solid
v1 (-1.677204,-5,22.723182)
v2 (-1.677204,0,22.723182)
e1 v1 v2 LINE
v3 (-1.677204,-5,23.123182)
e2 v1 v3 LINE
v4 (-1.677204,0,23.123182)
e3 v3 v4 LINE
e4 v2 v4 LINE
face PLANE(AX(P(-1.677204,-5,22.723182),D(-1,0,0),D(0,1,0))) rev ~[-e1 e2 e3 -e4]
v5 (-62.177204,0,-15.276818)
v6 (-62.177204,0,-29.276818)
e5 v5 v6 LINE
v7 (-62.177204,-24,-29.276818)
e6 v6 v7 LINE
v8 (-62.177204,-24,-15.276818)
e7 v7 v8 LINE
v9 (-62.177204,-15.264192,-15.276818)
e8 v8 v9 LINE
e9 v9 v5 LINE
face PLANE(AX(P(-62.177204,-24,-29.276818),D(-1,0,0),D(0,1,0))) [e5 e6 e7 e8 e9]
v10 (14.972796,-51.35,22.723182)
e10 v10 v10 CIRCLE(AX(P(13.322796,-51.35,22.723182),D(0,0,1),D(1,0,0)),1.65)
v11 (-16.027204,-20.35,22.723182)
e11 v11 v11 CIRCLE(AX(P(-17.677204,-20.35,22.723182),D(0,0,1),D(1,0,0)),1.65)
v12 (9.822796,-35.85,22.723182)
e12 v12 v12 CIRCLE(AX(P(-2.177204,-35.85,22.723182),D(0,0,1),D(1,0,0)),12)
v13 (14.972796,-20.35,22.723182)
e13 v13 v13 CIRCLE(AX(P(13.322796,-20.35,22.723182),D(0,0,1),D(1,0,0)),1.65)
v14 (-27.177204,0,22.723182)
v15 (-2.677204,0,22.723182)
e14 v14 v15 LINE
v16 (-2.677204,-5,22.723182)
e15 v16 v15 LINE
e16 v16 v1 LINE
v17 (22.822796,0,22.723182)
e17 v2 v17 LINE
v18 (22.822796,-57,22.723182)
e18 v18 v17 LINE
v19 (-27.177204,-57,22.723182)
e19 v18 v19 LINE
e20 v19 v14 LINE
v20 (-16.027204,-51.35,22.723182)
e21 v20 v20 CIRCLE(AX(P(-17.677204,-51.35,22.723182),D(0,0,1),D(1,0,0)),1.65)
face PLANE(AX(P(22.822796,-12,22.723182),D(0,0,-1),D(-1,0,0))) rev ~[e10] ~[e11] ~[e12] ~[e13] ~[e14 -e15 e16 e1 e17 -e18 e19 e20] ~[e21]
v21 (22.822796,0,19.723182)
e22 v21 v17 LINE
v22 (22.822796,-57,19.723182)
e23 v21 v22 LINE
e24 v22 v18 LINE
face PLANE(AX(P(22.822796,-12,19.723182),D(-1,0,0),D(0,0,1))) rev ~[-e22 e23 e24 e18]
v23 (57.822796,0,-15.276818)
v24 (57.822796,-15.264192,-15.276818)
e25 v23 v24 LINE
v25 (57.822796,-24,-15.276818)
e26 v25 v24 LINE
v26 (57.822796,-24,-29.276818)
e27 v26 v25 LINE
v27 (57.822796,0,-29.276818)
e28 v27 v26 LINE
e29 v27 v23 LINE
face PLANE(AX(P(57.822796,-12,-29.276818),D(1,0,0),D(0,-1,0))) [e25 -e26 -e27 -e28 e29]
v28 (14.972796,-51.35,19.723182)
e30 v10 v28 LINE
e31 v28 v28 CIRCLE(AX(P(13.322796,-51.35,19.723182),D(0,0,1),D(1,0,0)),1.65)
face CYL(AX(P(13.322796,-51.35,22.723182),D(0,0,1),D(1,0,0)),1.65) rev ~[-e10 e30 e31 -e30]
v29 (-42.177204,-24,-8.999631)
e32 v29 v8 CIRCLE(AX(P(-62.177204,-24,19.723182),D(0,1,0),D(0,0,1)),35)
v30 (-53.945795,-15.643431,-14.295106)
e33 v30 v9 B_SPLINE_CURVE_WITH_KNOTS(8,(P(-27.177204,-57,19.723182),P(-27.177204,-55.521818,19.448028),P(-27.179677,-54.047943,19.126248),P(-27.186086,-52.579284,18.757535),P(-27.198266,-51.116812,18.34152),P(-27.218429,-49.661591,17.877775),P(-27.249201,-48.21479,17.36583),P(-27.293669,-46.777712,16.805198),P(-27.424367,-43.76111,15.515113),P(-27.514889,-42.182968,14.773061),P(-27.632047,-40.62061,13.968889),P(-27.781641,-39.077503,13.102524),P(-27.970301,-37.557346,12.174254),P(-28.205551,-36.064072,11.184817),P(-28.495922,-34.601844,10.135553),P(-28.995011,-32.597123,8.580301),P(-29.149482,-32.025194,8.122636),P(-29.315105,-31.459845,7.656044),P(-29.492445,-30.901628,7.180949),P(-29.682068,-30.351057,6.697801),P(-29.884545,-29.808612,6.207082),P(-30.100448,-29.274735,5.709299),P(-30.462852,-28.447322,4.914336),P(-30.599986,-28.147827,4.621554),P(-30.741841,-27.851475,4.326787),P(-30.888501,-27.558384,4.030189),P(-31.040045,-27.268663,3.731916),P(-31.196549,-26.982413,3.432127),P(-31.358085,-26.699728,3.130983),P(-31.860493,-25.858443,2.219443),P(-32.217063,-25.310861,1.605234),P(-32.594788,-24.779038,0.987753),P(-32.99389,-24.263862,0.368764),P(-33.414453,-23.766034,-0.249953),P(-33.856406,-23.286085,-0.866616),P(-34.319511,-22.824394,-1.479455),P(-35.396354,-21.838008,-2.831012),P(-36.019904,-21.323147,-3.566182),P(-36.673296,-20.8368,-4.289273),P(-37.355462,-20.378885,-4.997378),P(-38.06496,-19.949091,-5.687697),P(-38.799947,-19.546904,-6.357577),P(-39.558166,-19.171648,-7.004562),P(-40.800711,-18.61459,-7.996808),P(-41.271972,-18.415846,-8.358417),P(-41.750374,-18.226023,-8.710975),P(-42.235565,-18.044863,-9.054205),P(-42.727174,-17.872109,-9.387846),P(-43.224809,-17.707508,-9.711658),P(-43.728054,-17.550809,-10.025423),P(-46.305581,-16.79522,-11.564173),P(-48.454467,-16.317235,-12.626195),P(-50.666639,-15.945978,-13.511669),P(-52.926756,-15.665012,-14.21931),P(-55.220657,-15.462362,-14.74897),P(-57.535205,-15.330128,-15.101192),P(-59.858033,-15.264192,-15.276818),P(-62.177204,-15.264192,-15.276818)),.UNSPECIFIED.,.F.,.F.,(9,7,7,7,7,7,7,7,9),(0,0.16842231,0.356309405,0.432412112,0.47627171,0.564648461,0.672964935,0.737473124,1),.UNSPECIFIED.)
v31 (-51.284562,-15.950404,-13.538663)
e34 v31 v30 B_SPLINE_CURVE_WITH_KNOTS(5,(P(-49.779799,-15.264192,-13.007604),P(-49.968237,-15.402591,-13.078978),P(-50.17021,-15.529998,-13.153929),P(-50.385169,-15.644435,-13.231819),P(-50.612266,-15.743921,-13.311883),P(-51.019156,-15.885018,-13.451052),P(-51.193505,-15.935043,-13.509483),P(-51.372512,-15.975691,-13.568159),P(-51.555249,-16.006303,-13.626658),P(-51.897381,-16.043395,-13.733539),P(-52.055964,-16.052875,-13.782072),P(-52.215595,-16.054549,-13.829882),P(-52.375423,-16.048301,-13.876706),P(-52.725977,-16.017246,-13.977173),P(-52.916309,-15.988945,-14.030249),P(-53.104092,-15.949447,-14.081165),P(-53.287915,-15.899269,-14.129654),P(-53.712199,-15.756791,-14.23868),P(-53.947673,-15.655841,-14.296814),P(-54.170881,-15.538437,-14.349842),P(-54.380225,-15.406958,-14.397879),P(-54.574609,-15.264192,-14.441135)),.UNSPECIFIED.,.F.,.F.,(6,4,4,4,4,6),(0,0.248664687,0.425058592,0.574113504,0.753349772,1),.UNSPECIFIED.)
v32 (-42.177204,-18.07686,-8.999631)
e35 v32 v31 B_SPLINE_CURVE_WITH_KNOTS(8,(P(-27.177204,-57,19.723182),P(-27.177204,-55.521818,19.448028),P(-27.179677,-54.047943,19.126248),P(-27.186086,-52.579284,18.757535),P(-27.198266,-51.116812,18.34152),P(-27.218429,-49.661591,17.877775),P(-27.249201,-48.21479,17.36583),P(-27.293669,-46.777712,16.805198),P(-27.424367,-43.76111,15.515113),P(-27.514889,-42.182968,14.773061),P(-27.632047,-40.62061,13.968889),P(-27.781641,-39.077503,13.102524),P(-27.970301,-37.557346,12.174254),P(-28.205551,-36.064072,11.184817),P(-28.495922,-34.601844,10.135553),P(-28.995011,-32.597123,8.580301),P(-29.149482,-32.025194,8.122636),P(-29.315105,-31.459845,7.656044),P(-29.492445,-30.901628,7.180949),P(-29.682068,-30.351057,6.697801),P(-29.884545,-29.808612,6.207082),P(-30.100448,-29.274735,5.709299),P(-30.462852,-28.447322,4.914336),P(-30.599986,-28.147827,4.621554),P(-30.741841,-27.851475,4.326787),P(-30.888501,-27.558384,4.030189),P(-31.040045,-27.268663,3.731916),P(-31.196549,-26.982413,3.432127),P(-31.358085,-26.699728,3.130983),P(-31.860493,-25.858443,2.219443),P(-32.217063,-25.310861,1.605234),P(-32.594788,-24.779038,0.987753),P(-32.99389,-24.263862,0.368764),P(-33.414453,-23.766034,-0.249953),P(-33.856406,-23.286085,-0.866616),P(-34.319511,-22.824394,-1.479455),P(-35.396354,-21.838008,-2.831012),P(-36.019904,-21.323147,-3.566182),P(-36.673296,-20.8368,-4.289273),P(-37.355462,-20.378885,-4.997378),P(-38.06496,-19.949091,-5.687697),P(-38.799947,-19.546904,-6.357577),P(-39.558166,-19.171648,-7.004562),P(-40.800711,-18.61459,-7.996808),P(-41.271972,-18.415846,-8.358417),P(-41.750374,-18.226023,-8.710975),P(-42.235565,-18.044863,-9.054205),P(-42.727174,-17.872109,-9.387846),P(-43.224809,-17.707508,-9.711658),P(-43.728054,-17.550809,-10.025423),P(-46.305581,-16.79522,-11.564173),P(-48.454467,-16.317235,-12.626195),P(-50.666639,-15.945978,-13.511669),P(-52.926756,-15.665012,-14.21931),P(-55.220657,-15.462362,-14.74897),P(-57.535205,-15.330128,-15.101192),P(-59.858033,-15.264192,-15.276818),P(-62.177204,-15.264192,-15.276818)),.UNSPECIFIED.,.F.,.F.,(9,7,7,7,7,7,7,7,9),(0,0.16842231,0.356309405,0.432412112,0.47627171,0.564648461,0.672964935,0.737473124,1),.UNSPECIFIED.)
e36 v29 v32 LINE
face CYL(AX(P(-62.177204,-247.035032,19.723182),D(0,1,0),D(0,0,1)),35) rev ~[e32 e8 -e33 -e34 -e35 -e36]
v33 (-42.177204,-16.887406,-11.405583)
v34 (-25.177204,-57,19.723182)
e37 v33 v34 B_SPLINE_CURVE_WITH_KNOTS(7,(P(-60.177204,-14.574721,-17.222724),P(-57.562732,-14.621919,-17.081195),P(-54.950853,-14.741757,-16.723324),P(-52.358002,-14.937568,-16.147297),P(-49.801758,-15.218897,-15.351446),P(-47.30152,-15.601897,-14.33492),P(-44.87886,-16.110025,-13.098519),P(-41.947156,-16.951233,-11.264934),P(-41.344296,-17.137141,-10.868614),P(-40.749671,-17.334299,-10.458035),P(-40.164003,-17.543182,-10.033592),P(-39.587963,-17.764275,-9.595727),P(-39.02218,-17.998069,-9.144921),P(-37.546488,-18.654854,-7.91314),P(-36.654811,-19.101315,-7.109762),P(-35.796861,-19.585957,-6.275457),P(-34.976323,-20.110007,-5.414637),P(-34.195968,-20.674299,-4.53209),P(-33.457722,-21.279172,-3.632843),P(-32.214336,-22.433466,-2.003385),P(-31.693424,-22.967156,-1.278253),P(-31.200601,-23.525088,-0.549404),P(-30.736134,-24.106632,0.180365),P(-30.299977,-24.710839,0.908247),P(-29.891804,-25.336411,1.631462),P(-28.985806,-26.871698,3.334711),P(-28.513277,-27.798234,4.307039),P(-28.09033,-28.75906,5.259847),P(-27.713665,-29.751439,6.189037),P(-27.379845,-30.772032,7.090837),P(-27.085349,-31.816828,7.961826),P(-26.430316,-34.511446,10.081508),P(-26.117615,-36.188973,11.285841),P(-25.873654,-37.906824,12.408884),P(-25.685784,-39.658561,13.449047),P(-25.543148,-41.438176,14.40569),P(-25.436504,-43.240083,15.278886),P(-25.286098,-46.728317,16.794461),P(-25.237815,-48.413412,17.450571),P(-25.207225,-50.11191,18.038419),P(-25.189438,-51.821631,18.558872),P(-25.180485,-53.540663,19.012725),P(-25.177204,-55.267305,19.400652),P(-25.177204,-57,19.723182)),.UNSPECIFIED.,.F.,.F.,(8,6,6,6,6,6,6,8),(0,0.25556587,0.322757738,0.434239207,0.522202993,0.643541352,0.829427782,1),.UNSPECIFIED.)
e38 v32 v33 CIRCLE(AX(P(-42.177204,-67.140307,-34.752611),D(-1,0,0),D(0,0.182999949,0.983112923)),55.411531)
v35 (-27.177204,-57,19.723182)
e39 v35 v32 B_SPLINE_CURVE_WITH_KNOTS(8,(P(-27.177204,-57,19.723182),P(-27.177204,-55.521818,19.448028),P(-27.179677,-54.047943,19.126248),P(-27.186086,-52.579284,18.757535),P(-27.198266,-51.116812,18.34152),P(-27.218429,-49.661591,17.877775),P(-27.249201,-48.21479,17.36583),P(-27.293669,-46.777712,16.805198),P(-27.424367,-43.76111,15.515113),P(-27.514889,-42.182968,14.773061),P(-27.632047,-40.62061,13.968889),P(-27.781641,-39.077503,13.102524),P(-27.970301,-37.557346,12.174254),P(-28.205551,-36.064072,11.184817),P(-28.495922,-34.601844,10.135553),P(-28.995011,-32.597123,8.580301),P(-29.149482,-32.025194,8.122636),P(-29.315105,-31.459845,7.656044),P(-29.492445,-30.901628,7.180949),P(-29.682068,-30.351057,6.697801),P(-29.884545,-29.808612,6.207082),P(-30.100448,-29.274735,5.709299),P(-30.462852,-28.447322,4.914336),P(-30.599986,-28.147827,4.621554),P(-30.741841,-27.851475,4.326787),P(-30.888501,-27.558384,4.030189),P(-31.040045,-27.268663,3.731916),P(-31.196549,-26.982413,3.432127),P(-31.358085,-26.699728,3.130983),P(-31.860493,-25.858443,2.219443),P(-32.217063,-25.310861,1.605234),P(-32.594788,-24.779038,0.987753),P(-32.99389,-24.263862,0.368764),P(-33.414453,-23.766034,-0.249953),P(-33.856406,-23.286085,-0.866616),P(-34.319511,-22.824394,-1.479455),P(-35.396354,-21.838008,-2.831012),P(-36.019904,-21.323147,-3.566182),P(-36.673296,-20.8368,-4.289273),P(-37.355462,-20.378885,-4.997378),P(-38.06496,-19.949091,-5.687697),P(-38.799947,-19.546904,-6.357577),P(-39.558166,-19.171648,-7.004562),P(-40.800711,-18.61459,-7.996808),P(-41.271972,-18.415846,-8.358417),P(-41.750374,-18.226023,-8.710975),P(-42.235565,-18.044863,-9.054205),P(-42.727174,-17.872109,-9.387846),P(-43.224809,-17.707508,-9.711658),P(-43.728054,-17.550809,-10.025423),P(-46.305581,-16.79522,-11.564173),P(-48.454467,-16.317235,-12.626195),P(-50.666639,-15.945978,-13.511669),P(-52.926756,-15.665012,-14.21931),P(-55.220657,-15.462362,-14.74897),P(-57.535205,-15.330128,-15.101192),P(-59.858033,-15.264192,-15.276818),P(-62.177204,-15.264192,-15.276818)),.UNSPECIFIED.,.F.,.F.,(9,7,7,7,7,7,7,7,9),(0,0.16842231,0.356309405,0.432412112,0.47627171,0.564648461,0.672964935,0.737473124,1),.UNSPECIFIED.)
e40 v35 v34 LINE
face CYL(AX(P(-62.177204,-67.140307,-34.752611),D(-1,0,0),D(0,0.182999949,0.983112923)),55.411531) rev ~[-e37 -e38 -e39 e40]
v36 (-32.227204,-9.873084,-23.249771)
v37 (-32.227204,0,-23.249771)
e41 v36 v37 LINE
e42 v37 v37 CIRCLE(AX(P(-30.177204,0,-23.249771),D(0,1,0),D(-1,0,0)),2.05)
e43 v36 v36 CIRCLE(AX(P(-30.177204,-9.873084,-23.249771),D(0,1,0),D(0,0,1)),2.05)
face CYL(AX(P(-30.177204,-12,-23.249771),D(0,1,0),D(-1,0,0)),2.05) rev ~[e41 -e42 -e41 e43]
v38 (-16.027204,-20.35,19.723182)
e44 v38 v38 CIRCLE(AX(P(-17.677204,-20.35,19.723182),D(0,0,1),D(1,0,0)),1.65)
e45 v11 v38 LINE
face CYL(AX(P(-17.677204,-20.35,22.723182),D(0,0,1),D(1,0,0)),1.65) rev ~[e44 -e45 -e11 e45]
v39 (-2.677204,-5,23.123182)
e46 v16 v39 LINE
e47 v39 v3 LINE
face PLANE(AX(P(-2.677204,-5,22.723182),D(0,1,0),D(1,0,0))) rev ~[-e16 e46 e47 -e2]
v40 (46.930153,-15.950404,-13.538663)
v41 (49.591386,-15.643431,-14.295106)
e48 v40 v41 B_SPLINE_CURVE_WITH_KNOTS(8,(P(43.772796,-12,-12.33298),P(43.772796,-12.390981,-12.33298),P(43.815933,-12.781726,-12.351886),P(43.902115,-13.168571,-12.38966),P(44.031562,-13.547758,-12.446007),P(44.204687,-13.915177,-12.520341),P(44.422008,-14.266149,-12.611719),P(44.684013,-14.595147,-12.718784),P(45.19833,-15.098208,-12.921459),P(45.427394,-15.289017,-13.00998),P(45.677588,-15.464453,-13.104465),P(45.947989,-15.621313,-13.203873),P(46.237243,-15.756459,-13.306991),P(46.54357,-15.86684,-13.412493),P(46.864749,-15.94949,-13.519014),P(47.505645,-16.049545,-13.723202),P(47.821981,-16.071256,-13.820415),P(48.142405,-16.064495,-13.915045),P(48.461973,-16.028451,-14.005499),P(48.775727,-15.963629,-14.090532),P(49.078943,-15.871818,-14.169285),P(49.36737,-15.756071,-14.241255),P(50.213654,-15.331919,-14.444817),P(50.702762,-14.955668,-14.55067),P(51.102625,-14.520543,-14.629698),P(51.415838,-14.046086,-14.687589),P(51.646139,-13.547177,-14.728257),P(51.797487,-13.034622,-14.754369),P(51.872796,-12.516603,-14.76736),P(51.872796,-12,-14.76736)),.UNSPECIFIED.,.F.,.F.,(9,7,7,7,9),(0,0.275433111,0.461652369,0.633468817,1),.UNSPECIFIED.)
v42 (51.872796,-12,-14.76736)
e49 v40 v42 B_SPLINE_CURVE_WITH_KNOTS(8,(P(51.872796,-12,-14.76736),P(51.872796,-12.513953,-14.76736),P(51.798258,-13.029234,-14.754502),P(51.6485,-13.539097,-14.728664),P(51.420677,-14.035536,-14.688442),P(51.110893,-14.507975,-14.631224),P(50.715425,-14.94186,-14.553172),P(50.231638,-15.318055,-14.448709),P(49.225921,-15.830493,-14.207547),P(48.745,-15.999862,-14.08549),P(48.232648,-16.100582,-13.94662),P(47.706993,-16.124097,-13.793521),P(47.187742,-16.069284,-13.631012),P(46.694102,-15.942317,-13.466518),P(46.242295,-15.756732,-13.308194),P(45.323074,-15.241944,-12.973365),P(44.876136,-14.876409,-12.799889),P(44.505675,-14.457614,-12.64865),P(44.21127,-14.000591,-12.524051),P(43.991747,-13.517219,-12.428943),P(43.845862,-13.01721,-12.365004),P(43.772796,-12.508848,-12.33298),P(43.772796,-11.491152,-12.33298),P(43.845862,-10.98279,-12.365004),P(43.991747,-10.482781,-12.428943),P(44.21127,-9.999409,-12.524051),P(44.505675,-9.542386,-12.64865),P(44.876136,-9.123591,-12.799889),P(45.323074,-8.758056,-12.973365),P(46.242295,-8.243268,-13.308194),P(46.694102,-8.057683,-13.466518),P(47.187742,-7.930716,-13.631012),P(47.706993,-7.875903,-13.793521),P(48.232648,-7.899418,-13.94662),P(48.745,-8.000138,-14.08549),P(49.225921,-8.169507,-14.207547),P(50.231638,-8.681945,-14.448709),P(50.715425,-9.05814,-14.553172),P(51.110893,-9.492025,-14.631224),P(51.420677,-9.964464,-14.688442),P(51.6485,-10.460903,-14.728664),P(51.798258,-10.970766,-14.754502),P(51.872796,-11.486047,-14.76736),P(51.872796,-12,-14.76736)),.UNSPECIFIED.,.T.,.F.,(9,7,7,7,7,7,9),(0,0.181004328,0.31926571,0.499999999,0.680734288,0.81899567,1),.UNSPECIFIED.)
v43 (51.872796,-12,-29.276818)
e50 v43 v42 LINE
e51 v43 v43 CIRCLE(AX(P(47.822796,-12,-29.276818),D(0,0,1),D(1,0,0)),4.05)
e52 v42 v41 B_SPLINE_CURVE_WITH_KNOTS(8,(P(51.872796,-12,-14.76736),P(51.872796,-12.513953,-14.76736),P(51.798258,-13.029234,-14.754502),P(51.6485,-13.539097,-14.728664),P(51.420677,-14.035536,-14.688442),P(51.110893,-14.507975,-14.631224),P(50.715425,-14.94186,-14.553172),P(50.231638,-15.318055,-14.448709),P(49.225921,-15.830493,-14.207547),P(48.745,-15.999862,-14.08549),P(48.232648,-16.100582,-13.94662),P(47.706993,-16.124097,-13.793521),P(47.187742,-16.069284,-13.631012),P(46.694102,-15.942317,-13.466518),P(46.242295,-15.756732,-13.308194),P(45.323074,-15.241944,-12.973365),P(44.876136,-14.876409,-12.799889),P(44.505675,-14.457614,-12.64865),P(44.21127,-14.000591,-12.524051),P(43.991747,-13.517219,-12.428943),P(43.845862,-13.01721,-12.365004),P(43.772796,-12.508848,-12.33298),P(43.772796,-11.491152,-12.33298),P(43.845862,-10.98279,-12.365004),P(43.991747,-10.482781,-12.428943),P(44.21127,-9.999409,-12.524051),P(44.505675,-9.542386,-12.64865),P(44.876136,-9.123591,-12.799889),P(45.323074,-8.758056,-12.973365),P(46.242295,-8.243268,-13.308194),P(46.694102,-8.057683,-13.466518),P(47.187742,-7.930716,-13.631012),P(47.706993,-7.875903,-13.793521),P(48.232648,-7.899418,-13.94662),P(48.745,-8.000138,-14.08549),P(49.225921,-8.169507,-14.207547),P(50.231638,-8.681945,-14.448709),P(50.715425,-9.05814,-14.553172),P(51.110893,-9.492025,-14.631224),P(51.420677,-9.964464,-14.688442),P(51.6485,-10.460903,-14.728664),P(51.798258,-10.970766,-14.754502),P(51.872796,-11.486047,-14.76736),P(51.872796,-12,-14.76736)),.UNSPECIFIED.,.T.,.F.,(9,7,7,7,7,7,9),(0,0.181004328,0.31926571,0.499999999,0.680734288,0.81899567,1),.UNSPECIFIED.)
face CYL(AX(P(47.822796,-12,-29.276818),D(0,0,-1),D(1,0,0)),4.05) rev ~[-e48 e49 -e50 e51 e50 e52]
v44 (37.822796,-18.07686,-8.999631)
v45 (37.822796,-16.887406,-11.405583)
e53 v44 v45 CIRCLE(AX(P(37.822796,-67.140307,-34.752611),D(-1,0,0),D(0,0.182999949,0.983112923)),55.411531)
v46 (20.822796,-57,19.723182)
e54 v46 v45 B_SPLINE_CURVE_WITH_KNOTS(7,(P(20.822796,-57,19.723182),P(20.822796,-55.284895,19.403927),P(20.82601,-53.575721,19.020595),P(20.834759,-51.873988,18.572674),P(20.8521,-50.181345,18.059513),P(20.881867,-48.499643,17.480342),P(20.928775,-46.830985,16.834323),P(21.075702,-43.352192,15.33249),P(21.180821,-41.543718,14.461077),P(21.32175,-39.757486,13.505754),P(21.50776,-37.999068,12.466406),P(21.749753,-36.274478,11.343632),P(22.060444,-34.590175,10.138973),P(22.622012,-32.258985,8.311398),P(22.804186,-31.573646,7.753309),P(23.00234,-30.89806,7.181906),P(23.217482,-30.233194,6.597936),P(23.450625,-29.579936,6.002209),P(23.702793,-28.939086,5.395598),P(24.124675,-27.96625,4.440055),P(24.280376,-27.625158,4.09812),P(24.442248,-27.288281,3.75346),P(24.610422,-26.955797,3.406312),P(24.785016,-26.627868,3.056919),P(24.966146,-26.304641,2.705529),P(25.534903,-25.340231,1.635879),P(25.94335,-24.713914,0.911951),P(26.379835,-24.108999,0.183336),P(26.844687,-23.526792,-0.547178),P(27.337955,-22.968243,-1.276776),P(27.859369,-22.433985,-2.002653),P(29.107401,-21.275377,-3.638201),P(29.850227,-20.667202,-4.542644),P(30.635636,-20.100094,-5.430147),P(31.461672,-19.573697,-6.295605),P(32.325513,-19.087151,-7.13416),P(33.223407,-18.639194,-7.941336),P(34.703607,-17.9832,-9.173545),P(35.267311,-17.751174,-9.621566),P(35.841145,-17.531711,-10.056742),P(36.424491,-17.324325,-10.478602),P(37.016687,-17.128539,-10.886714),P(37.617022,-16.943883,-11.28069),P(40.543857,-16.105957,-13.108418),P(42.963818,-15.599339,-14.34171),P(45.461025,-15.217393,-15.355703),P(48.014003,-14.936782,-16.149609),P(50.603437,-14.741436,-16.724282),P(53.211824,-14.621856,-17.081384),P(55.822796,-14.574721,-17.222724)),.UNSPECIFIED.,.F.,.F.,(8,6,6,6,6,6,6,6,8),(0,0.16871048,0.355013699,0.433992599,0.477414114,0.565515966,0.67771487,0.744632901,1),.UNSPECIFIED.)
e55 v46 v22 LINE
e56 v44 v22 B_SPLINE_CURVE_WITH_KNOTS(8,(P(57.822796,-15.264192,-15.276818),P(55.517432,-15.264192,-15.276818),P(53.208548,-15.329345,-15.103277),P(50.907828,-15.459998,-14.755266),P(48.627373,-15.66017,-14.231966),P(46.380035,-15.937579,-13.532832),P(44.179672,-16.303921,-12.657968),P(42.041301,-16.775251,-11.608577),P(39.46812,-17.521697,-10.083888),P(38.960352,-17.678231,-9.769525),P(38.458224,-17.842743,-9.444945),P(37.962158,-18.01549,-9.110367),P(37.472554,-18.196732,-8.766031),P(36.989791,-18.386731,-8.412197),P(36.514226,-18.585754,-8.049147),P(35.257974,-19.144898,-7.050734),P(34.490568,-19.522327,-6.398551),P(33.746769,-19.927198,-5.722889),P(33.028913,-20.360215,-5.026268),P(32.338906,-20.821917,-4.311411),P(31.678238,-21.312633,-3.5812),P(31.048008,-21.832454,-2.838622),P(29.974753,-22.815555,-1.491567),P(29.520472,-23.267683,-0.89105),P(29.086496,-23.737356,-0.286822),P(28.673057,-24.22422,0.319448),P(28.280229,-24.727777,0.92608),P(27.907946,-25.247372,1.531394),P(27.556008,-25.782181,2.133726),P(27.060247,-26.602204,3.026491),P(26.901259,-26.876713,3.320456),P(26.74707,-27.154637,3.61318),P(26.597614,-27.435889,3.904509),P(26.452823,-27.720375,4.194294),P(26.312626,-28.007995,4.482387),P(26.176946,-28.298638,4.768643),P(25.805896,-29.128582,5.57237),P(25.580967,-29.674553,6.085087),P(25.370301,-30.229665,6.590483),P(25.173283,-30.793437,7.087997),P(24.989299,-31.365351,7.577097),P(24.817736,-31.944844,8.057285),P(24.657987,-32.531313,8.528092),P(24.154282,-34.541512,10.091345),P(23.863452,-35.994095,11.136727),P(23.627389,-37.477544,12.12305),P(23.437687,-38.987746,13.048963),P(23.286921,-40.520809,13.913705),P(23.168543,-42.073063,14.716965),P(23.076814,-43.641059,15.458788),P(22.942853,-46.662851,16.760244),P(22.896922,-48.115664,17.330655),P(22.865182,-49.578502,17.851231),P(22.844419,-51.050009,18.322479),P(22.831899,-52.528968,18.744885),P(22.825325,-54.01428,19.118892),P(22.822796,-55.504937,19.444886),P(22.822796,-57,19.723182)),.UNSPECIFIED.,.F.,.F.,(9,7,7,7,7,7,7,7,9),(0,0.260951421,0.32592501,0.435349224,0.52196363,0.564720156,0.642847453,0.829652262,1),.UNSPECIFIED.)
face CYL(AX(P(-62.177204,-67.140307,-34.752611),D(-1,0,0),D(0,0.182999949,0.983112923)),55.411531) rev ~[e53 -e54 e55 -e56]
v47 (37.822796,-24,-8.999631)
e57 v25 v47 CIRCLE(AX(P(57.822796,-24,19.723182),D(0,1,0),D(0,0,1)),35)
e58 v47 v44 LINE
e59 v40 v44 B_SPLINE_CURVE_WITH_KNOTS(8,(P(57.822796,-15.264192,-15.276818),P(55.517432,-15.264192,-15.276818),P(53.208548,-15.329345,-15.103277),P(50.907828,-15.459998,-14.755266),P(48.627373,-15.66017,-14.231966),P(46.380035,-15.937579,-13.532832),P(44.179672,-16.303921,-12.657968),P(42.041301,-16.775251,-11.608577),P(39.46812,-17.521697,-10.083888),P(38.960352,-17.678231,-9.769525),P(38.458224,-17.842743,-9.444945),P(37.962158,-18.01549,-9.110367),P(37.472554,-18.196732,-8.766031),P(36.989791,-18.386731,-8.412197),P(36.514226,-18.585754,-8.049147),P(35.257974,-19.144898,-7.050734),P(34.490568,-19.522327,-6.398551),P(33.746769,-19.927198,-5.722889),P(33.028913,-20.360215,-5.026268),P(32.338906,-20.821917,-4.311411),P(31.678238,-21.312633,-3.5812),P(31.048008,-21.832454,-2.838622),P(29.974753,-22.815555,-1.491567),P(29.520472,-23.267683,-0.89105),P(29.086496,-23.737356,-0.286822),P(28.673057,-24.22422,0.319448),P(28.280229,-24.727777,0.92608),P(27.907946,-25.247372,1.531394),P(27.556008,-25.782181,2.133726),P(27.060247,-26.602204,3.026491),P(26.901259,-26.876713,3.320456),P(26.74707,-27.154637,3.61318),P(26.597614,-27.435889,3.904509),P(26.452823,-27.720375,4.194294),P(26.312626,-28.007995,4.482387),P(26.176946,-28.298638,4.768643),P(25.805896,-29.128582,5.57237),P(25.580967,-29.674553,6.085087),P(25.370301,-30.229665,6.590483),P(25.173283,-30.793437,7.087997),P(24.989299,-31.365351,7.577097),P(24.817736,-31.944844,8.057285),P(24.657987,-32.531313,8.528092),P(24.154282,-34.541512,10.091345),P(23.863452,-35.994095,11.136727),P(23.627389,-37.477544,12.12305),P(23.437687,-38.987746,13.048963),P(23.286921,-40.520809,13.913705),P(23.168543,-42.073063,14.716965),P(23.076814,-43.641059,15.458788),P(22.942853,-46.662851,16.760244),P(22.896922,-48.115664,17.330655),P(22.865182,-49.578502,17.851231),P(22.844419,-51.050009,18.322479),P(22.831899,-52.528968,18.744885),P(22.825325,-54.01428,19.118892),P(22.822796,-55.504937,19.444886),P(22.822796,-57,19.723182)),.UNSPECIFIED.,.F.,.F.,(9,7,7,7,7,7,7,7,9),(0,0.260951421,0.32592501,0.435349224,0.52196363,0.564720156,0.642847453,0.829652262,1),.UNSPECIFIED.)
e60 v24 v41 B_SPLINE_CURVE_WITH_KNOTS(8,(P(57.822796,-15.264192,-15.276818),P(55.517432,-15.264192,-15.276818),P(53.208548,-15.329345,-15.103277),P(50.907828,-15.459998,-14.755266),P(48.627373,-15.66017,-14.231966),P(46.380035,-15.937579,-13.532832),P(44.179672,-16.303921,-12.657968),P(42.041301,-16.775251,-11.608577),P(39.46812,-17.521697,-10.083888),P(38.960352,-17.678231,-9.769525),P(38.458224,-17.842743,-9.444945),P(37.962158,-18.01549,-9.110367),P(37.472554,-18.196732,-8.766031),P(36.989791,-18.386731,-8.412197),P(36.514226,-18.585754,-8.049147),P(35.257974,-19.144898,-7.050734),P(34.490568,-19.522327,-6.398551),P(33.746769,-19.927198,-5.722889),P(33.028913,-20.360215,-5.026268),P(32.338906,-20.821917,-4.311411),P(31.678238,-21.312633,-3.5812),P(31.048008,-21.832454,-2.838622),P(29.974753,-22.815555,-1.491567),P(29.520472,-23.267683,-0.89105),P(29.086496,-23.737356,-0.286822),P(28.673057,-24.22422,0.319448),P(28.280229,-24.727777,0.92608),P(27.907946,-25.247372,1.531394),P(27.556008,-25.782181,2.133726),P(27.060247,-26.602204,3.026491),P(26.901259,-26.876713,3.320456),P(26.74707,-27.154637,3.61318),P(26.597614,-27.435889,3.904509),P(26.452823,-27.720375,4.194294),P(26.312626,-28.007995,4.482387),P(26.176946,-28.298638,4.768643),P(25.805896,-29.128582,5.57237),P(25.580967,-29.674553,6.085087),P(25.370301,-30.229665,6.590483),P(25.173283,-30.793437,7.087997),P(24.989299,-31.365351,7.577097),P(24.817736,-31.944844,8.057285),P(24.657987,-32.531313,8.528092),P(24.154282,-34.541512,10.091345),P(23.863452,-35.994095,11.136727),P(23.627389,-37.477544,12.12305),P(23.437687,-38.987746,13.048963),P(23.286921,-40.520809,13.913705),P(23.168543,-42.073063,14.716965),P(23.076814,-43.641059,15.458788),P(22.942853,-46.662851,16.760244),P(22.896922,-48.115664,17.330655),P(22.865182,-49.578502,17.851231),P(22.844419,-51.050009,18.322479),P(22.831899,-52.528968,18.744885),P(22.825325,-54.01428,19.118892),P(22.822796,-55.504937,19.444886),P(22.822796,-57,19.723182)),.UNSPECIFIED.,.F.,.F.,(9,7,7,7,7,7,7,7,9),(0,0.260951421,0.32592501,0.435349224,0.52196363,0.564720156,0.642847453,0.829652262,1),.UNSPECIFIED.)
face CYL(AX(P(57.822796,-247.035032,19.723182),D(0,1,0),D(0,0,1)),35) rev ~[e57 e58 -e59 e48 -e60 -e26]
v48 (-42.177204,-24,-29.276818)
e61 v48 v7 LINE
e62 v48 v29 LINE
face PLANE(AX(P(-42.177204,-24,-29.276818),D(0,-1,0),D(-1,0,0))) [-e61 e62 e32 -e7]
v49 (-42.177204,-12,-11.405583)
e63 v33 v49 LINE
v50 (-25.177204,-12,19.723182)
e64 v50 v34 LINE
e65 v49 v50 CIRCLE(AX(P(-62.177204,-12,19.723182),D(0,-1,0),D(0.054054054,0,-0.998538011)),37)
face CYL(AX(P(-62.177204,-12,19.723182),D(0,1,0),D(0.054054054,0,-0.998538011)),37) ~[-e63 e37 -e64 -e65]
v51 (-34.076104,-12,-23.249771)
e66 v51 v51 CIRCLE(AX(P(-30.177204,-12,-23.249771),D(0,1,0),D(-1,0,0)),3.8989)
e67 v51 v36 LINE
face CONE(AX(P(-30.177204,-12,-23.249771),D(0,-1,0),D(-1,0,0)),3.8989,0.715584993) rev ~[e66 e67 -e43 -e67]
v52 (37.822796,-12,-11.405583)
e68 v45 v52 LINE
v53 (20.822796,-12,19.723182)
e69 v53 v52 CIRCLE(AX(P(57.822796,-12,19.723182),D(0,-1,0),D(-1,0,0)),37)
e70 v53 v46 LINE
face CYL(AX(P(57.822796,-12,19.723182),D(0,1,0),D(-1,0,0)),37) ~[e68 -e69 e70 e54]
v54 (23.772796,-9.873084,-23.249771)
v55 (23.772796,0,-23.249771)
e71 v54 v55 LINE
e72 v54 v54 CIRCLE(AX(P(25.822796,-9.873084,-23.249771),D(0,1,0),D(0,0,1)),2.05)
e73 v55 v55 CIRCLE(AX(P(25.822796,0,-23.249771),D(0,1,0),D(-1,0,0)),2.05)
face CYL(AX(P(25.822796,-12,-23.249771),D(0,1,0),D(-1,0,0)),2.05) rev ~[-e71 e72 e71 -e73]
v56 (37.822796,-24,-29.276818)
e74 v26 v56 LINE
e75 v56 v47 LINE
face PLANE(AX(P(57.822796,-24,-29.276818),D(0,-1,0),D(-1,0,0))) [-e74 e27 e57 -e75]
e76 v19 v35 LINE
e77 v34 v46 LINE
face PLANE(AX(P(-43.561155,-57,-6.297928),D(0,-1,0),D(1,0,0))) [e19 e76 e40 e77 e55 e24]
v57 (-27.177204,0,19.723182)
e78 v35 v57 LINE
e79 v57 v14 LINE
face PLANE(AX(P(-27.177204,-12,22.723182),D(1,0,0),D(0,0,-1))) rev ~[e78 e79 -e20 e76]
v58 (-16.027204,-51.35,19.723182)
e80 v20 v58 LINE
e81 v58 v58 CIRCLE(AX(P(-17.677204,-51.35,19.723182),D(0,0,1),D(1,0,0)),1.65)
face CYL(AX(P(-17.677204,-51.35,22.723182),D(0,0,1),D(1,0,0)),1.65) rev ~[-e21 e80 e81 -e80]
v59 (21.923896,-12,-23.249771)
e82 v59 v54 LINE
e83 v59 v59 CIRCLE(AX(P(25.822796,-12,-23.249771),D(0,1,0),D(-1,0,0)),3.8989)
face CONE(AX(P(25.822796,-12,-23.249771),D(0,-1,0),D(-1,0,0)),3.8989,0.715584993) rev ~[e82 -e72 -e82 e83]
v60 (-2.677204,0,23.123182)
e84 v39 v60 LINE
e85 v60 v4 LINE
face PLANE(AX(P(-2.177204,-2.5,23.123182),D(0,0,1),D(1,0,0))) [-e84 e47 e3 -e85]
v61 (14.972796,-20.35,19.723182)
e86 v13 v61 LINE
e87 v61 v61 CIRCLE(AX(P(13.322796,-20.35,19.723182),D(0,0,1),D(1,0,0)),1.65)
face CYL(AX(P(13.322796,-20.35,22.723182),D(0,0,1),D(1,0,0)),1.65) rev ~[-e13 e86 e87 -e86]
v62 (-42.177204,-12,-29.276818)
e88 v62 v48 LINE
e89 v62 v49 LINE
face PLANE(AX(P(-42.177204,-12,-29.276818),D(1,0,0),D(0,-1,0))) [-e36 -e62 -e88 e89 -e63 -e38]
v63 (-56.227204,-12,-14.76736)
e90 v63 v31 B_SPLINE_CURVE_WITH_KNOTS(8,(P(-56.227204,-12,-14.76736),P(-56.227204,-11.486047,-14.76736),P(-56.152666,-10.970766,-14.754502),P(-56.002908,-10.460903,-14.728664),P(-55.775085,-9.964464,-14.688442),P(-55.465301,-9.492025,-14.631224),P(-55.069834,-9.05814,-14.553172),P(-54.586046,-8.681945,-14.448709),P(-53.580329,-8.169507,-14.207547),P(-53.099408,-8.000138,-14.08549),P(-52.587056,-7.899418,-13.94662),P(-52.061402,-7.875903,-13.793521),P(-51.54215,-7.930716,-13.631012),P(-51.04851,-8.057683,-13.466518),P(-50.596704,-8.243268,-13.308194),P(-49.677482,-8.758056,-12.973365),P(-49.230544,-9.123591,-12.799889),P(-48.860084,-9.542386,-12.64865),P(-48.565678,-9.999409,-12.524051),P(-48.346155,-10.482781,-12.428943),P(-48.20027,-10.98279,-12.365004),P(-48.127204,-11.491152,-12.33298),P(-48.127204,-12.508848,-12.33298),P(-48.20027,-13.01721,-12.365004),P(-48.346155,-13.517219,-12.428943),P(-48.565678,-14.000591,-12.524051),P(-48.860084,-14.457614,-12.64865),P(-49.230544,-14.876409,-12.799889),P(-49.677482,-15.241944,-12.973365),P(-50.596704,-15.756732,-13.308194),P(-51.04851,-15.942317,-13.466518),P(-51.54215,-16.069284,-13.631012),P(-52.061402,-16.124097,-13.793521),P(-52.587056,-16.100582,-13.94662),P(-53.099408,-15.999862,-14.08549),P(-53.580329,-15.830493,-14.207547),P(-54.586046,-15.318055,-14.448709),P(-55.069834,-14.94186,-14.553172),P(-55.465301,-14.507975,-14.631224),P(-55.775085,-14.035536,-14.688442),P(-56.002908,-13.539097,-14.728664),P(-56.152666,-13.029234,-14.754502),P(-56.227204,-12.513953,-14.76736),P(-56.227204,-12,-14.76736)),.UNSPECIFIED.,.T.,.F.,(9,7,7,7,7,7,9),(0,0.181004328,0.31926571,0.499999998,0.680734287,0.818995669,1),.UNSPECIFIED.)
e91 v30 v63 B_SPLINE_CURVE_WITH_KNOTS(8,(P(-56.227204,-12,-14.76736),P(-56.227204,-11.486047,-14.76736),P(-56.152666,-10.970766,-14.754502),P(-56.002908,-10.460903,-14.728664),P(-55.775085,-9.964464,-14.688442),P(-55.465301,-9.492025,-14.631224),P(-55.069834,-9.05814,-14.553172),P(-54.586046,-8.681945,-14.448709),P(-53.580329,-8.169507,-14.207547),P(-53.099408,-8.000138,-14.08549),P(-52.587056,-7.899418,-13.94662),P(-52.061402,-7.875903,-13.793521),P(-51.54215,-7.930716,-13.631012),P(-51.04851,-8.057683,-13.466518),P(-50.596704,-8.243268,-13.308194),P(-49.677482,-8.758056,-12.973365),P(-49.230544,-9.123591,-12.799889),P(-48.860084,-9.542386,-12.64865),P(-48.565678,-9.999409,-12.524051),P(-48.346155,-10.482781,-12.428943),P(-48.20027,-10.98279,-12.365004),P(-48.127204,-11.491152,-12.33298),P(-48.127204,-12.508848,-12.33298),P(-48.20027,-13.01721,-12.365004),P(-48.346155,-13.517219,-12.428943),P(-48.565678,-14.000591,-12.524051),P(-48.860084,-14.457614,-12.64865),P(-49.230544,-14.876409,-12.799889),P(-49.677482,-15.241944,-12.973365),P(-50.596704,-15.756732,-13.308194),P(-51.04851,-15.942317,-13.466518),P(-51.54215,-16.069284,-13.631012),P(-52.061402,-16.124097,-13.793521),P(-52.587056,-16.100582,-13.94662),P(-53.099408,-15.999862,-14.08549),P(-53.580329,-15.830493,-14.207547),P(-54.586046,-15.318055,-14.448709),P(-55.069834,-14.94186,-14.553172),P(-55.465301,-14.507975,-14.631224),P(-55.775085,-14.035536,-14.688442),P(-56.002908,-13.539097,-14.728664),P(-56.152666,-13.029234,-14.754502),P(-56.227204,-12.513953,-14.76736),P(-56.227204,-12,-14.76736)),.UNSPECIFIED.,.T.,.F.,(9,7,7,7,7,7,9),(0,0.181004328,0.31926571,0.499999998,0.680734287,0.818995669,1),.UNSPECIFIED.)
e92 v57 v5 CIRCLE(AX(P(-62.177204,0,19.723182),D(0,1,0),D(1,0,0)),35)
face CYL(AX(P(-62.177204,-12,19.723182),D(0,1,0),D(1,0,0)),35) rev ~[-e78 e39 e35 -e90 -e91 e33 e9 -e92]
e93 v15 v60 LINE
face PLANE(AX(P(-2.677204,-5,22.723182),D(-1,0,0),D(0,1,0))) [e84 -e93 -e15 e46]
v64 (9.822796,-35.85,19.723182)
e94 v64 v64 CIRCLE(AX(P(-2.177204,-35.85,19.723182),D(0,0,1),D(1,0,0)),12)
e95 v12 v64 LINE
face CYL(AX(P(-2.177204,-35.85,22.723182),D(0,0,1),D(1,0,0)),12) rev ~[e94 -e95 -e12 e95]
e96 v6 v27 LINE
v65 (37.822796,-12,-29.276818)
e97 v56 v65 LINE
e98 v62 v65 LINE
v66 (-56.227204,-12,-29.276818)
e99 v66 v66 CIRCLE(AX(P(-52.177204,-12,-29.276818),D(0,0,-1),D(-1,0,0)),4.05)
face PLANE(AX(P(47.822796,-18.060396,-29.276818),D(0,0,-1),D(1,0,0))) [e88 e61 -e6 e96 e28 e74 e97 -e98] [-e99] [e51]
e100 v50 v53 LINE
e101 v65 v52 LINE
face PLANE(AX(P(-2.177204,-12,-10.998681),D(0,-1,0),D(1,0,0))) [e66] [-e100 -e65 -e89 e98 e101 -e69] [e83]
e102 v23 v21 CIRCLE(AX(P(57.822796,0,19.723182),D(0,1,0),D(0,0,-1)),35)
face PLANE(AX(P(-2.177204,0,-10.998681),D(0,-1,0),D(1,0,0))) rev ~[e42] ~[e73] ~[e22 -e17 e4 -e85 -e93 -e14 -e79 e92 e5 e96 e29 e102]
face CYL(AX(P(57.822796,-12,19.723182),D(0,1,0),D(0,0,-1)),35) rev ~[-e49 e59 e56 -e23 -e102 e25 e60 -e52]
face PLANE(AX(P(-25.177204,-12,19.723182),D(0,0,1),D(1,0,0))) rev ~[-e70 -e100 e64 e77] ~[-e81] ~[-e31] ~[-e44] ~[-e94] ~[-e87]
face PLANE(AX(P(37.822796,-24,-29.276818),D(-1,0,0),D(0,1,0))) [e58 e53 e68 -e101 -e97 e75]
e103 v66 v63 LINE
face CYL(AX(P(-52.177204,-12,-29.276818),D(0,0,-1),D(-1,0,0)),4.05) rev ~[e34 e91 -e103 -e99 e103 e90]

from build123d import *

# Parameters (mm, degrees)
F0_W           = 50
F0_H           = 3
F1_DEPTH       = 12
F3_DEPTH       = 45
F5_DEPTH       = 120.001
F6_R           = 12
F6_R_2         = 1.65
F7_DEPTH       = 25
F9_D           = 4.1000000042
F9_CSINK_D     = 7.7978
F9_CSINK_ANGLE = 82
F10_W          = 1
F10_H          = 5
F11_DEPTH      = 0.4
F13_END_RADIUS = 35
F13_REACH      = 75.7248075794
F14_END_RADIUS = 35
F14_REACH      = 75.7248075794
F15_DEPTH      = 25


with BuildPart() as f1:
    # F0 (on Front) → F1 (new body)
    with BuildSketch(Plane.XZ):
        with BuildLine():
            Line((22.8227958083, 19.723181963), (-27.1772041917, 19.723181963))
            ThreePointArc((-27.1772041917, 19.723181963), (-37.4284668502, -5.0255553786), (-62.1772041917, -15.276818037))
            Line((-62.1772041917, -15.276818037), (-62.1772041917, -29.276818037))
            Line((-62.1772041917, -29.276818037), (57.8227958083, -29.276818037))
            Line((57.8227958083, -29.276818037), (57.8227958083, -15.276818037))
            ThreePointArc((57.8227958083, -15.276818037), (33.0740584668, -5.0255553786), (22.8227958083, 19.723181963))
        make_face()
        with Locations((-2.1772041917, 21.223181963)):
            Rectangle(F0_W, F0_H)
    extrude(amount=F1_DEPTH)

    # F2 (on face) → F3 (join)
    with BuildSketch(Plane.XZ.offset(12)):
        with BuildLine():
            Line((-25.1772041917, 19.723181963), (-27.1772041917, 19.723181963))
            ThreePointArc((-27.1772041917, 19.723181963), (-37.4284668502, -5.0255553786), (-62.1772041917, -15.276818037))
            Line((-62.1772041917, -15.276818037), (-62.1772041917, -29.276818037))
            Line((-62.1772041917, -29.276818037), (-60.1772041917, -29.276818037))
            Line((-60.1772041917, -29.276818037), (-60.1772041917, -17.2227244409))
            ThreePointArc((-60.1772041917, -17.2227244409), (-35.3164521546, -5.722839337), (-25.1772041917, 19.723181963))
        make_face()
        Polygon((-27.1772041917, 22.723181963), (-27.1772041917, 19.723181963), (-25.1772041917, 19.723181963), (20.8227958083, 19.723181963), (22.8227958083, 19.723181963), (22.8227958083, 22.723181963), align=None)
        with BuildLine():
            Line((22.8227958083, 19.723181963), (20.8227958083, 19.723181963))
            ThreePointArc((20.8227958083, 19.723181963), (30.9620437712, -5.722839337), (55.8227958083, -17.2227244409))
            Line((55.8227958083, -17.2227244409), (55.8227958083, -29.276818037))
            Line((55.8227958083, -29.276818037), (57.8227958083, -29.276818037))
            Line((57.8227958083, -29.276818037), (57.8227958083, -15.276818037))
            ThreePointArc((57.8227958083, -15.276818037), (33.0740584668, -5.0255553786), (22.8227958083, 19.723181963))
        make_face()
    extrude(amount=F3_DEPTH)

    # F4 (on face) → F5 (cut, through all)
    with BuildSketch(Plane(origin=(-62.1772041917, 0, 0), x_dir=(0, -1, 0), z_dir=(-1, 0, 0))):
        with BuildLine():
            Line((57, -15.276818037), (57, 19.723181963))
            ThreePointArc((57, 19.723181963), (26.3280584166, 2.7280262742), (12, -29.276818037))
            Line((12, -29.276818037), (57, -29.276818037))
            Line((57, -29.276818037), (57, -15.276818037))
        make_face()
    extrude(amount=-F5_DEPTH, mode=Mode.SUBTRACT)

    # F6 (on face) → F7 (cut)
    with BuildSketch(Plane.XY.offset(22.723181963)):
        with Locations((-2.1772041917, -35.85)):
            Circle(F6_R)
        with Locations((-17.6772041917, -51.35)):
            Circle(F6_R_2)
        with Locations((-17.6772041917, -20.35)):
            Circle(F6_R_2)
        with Locations((13.3227958083, -51.35)):
            Circle(F6_R_2)
        with Locations((13.3227958083, -20.35)):
            Circle(F6_R_2)
    extrude(amount=-F7_DEPTH, mode=Mode.SUBTRACT)

    # F9 (through all)
    with Locations(Plane.XZ.offset(12)):
        with Locations((-30.1772041917, -23.2497712389), (25.8227958083, -23.2497712389)):
            CounterSinkHole(F9_D / 2, F9_CSINK_D / 2, counter_sink_angle=F9_CSINK_ANGLE)

    # F10 (on face) → F11 (join)
    with BuildSketch(Plane.XY.offset(22.723181963)):
        with Locations((-2.1772041917, -2.5)):
            Rectangle(F10_W, F10_H)
    extrude(amount=F11_DEPTH)

    f13_end = (Plane(origin=(-62.1772041917, -28.5, 19.723181963), x_dir=(0, 0, 1), z_dir=(0, 1, 0)) * Cylinder(F13_END_RADIUS, 437.0700631752, mode=Mode.PRIVATE)).faces().sort_by_distance((-37.4284668502, -0.7549172174, -5.0255553786))[0]
    # F12 (on face) → F13 (join, up to the whole of a round face its end follows)
    with BuildSketch(Plane(origin=(0, 0, -29.276818037), x_dir=(1, 0, 0), z_dir=(0, 0, -1))):
        with BuildLine():
            Line((-62.1772041917, 24), (-62.1772041917, 12))
            Line((-62.1772041917, 12), (-60.1772041917, 12))
            Line((-60.1772041917, 12), (-56.2272041917, 12))
            ThreePointArc((-56.2272041917, 12), (-52.1772041917, 16.05), (-48.1272041917, 12))
            Line((-48.1272041917, 12), (-42.1772041917, 12))
            Line((-42.1772041917, 12), (-42.1772041917, 24))
            Line((-42.1772041917, 24), (-62.1772041917, 24))
        make_face()
        with BuildLine():
            Line((-56.2272041917, 12), (-48.1272041917, 12))
            ThreePointArc((-48.1272041917, 12), (-52.1772041917, 16.05), (-56.2272041917, 12))
        make_face()
    f13_long = extrude(amount=-F13_REACH, mode=Mode.PRIVATE)
    add(split(f13_long, bisect_by=f13_end, keep=Keep.TOP, mode=Mode.PRIVATE))

    f14_end = (Plane(origin=(57.8227958083, -28.5, 19.723181963), x_dir=(0, 0, 1), z_dir=(0, 1, 0)) * Cylinder(F14_END_RADIUS, 437.0700631752, mode=Mode.PRIVATE)).faces().sort_by_distance((33.0740584668, -0.7549172174, -5.0255553786))[0]
    # F12 (on face) → F14 (join, up to the whole of a round face its end follows)
    with BuildSketch(Plane(origin=(0, 0, -29.276818037), x_dir=(1, 0, 0), z_dir=(0, 0, -1))):
        with BuildLine():
            Line((37.8227958083, 24), (37.8227958083, 12))
            Line((37.8227958083, 12), (43.7727958083, 12))
            ThreePointArc((43.7727958083, 12), (47.8227958083, 16.05), (51.8727958083, 12))
            Line((51.8727958083, 12), (55.8227958083, 12))
            Line((55.8227958083, 12), (57.8227958083, 12))
            Line((57.8227958083, 12), (57.8227958083, 24))
            Line((57.8227958083, 24), (37.8227958083, 24))
        make_face()
        with BuildLine():
            Line((51.8727958083, 12), (43.7727958083, 12))
            ThreePointArc((43.7727958083, 12), (47.8227958083, 7.95), (51.8727958083, 12))
        make_face()
    f14_long = extrude(amount=-F14_REACH, mode=Mode.PRIVATE)
    add(split(f14_long, bisect_by=f14_end, keep=Keep.TOP, mode=Mode.PRIVATE))

    # F12 (on face) → F15 (cut)
    with BuildSketch(Plane(origin=(0, 0, -29.276818037), x_dir=(1, 0, 0), z_dir=(0, 0, -1))):
        with BuildLine():
            Line((-56.2272041917, 12), (-48.1272041917, 12))
            ThreePointArc((-48.1272041917, 12), (-52.1772041917, 16.05), (-56.2272041917, 12))
        make_face()
        with BuildLine():
            ThreePointArc((-56.2272041917, 12), (-52.1772041917, 7.95), (-48.1272041917, 12))
            Line((-48.1272041917, 12), (-56.2272041917, 12))
        make_face()
        with BuildLine():
            Line((51.8727958083, 12), (43.7727958083, 12))
            ThreePointArc((43.7727958083, 12), (47.8227958083, 7.95), (51.8727958083, 12))
        make_face()
        with BuildLine():
            ThreePointArc((51.8727958083, 12), (47.8227958083, 16.05), (43.7727958083, 12))
            Line((43.7727958083, 12), (51.8727958083, 12))
        make_face()
    extrude(amount=-F15_DEPTH, mode=Mode.SUBTRACT)


solid = f1.part
